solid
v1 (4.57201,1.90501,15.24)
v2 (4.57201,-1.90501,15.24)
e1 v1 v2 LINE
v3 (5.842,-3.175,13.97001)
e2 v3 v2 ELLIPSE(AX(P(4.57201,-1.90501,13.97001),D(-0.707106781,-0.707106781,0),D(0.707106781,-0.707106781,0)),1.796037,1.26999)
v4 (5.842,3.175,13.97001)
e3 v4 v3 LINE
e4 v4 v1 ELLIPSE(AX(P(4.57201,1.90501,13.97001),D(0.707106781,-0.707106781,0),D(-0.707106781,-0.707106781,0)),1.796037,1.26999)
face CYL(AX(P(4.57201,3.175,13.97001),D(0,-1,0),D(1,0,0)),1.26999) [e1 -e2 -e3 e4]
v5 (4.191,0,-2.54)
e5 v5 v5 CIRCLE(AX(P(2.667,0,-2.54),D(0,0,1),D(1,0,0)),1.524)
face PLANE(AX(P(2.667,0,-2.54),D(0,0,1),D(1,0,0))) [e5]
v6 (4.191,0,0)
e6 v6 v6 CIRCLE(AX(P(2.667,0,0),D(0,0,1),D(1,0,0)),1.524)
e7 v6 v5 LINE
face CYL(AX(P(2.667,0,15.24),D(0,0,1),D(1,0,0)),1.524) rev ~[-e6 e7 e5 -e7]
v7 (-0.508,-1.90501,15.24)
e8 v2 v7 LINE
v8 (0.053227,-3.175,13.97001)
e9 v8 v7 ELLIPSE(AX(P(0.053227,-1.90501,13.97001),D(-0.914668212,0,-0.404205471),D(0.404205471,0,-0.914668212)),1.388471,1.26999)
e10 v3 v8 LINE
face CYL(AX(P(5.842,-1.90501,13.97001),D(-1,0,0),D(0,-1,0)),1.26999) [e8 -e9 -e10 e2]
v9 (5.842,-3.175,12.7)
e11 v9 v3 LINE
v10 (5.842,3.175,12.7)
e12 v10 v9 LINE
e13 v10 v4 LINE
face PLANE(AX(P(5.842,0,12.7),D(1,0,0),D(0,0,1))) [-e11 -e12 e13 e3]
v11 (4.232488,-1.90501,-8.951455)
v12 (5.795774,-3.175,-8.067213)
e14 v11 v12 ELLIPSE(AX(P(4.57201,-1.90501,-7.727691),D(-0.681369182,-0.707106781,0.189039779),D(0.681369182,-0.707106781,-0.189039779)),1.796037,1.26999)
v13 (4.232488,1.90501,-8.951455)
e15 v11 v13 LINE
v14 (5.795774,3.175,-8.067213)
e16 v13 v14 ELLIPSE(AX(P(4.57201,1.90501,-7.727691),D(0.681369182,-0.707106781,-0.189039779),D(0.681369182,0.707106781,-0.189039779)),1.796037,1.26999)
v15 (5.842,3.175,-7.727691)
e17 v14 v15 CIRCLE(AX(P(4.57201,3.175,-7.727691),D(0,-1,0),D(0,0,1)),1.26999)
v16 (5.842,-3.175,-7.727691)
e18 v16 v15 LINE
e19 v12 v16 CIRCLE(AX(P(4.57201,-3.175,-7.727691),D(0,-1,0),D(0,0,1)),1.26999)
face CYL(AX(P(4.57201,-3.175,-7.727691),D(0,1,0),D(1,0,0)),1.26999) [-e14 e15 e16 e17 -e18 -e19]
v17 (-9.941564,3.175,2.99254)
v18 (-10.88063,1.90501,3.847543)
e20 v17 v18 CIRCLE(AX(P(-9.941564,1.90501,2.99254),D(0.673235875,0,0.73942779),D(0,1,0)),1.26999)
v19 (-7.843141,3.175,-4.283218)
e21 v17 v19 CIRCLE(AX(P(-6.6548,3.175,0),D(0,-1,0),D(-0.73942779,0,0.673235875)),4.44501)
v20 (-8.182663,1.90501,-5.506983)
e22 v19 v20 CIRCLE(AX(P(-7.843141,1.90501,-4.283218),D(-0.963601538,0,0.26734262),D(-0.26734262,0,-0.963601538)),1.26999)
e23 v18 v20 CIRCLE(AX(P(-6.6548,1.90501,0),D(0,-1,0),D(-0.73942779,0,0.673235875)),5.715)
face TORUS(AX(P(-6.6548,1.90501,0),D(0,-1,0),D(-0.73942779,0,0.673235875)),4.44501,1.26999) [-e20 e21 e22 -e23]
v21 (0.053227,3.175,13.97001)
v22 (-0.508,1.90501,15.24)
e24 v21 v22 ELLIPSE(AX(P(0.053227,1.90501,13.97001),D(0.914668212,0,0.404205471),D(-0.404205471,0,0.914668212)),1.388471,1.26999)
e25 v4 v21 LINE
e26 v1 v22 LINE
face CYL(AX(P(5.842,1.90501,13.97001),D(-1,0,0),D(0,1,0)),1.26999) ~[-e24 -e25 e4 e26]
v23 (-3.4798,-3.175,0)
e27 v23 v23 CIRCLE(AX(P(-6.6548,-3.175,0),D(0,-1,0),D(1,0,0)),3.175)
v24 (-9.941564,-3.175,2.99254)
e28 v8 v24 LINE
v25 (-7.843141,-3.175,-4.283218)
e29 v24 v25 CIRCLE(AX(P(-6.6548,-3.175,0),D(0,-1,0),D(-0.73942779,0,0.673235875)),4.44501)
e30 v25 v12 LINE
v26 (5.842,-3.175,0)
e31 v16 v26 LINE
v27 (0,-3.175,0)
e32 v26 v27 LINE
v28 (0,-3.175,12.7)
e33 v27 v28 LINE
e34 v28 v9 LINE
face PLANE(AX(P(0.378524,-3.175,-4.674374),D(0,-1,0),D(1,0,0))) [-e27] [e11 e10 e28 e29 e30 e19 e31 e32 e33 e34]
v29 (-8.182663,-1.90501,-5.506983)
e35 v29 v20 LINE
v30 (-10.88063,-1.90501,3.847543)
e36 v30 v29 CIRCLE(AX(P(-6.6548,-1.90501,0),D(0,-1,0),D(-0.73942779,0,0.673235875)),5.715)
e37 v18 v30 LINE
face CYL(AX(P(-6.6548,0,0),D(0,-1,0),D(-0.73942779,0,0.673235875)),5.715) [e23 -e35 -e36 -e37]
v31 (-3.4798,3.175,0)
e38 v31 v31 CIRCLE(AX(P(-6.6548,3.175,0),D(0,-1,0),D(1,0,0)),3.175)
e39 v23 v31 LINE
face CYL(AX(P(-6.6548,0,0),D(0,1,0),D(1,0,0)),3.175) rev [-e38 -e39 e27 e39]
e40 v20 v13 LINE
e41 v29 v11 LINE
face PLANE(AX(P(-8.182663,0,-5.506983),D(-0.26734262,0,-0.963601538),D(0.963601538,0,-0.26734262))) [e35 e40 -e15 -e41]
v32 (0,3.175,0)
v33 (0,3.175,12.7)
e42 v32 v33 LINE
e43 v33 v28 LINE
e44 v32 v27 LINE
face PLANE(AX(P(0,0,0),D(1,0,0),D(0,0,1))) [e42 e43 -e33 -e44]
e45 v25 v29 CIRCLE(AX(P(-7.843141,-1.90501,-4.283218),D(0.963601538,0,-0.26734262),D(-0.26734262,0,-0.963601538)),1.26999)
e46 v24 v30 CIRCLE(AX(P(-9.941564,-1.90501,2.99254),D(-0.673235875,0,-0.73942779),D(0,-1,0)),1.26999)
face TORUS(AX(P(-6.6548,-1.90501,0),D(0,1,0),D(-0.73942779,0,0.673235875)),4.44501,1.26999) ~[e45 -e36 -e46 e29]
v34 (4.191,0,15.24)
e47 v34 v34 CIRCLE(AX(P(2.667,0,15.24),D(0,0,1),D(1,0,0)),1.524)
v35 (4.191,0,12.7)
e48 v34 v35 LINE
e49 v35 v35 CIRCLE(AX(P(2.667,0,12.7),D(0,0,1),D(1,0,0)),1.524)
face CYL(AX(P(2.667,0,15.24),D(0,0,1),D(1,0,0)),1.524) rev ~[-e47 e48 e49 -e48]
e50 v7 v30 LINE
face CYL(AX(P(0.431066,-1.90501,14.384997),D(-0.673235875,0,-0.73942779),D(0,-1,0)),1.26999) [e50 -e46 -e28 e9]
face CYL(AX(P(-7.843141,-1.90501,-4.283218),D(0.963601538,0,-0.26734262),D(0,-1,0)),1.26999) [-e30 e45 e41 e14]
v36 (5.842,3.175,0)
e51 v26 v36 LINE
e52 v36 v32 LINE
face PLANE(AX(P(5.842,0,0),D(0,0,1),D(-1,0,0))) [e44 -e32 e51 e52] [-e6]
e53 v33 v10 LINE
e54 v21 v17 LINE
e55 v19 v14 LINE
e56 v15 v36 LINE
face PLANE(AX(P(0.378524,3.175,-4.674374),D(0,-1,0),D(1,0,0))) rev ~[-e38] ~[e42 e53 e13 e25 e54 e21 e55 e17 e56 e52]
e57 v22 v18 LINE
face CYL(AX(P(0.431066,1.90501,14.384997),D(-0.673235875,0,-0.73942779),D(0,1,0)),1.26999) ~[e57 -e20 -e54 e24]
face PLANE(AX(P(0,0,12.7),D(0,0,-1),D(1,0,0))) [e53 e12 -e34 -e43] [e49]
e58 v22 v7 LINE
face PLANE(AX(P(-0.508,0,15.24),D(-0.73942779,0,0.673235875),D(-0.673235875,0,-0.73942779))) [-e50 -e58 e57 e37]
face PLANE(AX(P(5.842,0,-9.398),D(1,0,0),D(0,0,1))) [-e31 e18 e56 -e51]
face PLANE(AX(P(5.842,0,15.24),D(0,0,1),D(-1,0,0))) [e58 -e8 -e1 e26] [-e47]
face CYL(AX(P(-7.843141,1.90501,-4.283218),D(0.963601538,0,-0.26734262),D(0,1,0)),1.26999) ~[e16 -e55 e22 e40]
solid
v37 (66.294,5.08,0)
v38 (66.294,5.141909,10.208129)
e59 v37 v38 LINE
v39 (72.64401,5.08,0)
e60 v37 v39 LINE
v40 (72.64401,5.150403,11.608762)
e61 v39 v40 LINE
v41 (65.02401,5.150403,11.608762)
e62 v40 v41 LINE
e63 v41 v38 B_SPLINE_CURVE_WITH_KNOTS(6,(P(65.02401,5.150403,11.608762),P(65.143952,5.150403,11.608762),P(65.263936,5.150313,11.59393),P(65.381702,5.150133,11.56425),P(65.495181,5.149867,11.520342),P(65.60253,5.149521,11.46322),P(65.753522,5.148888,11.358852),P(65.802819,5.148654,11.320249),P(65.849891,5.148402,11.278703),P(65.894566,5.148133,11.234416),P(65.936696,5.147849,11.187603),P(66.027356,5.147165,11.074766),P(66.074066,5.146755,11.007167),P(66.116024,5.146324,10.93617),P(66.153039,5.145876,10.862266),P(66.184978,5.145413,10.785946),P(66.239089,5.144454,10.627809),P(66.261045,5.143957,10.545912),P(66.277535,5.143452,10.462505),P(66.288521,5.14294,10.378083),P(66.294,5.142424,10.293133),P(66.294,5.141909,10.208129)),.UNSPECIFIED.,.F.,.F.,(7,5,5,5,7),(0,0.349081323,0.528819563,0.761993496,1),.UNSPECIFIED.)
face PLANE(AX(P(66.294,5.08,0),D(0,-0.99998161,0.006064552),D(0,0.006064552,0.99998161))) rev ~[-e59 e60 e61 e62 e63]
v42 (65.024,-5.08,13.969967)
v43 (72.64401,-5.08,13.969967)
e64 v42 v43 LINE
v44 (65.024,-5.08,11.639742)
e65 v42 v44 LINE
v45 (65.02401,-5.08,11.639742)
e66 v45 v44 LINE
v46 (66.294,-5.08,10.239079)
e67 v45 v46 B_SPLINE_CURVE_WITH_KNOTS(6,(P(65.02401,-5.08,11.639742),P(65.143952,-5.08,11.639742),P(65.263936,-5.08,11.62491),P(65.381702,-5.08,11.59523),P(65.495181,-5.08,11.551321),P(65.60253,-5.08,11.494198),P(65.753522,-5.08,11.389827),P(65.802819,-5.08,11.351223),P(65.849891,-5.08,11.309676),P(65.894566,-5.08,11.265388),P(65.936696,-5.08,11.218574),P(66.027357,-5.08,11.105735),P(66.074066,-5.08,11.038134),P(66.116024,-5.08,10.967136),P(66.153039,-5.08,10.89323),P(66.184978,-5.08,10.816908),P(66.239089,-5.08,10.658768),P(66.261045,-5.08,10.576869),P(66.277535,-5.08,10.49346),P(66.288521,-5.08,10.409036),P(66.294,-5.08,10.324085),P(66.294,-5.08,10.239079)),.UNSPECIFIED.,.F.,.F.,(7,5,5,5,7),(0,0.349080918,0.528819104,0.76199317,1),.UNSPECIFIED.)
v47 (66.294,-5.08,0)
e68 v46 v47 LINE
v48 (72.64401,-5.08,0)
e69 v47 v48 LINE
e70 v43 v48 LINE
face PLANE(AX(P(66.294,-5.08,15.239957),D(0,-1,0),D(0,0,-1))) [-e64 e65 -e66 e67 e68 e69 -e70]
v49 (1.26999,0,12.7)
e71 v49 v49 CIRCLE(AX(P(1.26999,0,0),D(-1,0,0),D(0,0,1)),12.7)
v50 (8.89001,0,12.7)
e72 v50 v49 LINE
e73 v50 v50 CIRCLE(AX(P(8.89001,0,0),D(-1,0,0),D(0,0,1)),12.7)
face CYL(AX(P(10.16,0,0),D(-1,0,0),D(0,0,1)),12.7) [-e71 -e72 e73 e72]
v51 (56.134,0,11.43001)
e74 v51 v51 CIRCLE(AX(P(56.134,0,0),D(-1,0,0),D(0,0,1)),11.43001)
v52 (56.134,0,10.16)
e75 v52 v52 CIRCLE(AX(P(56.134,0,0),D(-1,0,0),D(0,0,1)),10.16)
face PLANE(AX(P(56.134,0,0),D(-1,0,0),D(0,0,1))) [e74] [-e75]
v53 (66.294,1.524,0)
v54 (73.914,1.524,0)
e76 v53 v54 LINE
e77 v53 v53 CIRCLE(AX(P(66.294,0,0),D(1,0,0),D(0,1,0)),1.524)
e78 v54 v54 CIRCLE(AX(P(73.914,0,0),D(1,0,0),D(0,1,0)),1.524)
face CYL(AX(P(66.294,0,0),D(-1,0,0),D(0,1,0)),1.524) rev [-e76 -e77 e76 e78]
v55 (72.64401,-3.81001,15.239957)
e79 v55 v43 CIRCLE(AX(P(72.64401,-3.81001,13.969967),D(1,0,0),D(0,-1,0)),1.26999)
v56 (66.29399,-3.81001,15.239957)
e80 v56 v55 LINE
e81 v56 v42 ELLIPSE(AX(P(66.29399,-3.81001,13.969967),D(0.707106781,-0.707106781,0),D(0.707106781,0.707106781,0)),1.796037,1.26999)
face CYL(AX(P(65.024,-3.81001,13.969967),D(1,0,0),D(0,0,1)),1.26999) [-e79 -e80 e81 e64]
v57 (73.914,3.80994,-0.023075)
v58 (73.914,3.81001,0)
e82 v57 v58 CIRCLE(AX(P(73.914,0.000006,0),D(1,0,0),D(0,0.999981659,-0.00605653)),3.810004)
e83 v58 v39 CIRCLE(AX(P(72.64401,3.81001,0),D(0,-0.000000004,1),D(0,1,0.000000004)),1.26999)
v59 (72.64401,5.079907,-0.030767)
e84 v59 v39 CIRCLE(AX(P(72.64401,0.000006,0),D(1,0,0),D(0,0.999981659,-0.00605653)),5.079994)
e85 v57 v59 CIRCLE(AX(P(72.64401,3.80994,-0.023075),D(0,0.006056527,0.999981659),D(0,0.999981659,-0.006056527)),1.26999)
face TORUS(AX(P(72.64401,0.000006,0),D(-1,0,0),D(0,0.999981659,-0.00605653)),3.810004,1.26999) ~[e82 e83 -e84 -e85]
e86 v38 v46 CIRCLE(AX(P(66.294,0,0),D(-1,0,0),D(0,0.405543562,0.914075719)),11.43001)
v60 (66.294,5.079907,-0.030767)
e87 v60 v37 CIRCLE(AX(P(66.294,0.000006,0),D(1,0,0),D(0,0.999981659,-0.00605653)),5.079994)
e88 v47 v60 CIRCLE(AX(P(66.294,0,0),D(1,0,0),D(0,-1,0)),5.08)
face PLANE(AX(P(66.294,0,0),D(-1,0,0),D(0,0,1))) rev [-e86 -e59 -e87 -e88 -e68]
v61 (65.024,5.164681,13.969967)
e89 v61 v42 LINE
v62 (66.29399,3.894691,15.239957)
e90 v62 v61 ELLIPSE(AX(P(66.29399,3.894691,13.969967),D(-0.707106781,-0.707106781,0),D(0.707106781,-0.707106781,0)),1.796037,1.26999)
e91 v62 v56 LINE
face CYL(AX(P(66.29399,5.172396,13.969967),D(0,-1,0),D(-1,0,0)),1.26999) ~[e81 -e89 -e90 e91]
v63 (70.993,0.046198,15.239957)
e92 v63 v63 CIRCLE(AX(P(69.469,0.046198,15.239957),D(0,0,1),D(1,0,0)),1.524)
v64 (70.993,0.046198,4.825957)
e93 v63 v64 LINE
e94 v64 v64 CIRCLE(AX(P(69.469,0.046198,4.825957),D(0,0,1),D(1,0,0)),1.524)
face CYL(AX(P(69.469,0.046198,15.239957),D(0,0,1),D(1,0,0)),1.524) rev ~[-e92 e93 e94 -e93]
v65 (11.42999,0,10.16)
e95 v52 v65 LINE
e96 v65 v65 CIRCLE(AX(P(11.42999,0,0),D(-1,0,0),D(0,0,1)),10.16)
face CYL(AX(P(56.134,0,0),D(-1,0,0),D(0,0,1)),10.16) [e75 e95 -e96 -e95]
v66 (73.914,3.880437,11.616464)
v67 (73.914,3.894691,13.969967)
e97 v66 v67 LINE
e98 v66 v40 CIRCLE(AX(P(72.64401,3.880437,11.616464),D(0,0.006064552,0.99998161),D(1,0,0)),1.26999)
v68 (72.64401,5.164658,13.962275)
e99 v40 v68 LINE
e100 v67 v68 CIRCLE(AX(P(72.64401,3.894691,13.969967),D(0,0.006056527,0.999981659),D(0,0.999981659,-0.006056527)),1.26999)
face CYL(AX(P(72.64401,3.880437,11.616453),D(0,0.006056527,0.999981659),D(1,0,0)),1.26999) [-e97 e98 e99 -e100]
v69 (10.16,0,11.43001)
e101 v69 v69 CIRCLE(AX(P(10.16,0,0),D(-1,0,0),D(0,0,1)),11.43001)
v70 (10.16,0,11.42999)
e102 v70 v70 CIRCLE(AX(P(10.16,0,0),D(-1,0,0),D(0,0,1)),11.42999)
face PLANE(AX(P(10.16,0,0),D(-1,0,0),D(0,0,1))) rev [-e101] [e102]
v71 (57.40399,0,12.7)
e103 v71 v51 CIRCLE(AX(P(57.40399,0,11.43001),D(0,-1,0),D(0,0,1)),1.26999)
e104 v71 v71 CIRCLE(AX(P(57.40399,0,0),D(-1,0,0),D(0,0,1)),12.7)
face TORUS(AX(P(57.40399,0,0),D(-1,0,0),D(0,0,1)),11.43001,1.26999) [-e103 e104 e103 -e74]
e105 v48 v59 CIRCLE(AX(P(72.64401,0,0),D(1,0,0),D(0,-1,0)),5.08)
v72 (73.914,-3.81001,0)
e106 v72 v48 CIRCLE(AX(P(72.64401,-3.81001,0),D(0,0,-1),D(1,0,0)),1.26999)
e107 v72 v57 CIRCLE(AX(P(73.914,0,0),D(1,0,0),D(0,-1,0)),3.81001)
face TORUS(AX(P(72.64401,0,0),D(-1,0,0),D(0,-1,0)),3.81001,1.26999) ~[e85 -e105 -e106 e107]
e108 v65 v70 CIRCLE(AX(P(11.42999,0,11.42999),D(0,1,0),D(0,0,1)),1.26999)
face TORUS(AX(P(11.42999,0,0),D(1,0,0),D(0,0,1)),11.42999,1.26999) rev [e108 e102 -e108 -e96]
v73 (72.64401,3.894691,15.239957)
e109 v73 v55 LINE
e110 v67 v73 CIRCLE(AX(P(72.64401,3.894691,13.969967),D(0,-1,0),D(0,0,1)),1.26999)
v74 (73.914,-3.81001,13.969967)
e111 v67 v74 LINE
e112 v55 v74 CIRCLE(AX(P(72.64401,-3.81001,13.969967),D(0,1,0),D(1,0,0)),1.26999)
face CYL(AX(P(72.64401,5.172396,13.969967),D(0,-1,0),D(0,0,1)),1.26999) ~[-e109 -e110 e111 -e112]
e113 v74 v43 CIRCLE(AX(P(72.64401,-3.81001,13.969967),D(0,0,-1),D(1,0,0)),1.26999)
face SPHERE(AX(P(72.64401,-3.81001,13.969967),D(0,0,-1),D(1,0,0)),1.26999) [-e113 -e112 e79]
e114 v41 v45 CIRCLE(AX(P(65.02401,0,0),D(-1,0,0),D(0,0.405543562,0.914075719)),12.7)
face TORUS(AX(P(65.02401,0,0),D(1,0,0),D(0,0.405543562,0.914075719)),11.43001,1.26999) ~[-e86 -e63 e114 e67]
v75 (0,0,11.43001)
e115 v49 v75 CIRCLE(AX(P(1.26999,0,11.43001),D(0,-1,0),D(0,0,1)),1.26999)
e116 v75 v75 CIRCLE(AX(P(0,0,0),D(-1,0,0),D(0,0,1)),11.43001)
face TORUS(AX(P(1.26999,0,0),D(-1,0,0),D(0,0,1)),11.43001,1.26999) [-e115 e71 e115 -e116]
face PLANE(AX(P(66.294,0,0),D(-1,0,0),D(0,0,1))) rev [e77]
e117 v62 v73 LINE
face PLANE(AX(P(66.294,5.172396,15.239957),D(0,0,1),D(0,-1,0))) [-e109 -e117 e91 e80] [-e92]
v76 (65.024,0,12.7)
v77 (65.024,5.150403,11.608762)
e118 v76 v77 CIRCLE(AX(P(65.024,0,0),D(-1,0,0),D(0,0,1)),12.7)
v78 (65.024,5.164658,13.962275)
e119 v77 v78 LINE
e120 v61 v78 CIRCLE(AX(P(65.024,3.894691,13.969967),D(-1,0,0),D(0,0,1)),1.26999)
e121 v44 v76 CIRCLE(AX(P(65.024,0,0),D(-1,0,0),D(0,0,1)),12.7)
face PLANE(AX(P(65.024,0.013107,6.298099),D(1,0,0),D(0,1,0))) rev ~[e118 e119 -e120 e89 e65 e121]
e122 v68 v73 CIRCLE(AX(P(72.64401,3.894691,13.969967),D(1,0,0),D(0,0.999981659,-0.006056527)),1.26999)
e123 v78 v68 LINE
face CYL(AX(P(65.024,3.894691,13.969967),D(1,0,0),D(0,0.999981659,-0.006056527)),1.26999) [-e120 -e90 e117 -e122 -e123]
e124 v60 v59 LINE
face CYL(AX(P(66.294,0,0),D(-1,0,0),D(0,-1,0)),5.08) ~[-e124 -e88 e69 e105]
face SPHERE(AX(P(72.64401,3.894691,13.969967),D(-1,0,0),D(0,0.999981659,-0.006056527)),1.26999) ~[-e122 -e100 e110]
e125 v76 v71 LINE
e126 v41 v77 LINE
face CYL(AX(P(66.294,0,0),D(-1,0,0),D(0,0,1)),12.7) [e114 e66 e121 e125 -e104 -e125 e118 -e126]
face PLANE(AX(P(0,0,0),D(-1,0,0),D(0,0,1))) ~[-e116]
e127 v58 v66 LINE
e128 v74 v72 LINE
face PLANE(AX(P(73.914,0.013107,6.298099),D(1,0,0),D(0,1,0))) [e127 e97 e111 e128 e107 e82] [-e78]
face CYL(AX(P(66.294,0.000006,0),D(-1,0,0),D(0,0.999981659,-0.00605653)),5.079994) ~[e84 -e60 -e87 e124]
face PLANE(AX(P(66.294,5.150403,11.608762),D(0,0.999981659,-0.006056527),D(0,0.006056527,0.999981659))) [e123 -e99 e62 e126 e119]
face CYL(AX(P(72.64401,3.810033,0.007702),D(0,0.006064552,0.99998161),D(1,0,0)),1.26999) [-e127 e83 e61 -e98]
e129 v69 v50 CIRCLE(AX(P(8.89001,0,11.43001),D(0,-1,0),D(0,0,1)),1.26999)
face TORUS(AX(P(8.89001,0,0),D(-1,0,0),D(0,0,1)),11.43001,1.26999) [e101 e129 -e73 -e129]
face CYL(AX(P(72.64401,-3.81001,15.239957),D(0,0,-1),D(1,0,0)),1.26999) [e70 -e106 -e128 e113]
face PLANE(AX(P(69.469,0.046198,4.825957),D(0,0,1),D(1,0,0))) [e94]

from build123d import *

# Parameters (mm, degrees)
F0_W          = 5.842
F0_H          = 12.7
F0_R          = 3.175
F2_DEPTH      = 3.175
F3_R          = 1.524
F4_DEPTH      = 7.62
F4_DEPTH_BACK = 1.27
F5_R          = 1.524
F6_DEPTH      = 17.78
F7_R          = 1.524
F8_DEPTH      = 10.414
F9_R          = 1.26999
F9_2_R        = 1.26999


# Not quite as in the source:
# - a fillet or chamfer is up to 0.001 mm smaller than in the source, because OpenCascade refuses the exact size
# - ends of sketch curves that miss each other by under 0.0002 mm in the source are joined


with BuildPart() as f1:
    # F0 (on Front) → F1 (revolve)
    with BuildSketch(Plane.XZ):
        Polygon((5.842, 12.7), (5.842, 0), (66.294, 0), (66.294, 12.7), (56.134, 12.7), (56.134, 10.16), (10.16, 10.16), (10.16, 12.7), align=None)
        with Locations((2.921, 6.35)):
            Rectangle(F0_W, F0_H)
    revolve(axis=Axis((33.147, 0, 0), (-1, 0, 0)))

    # F3 (on face) → F4 (join, two sides)
    with BuildSketch(Plane.YZ.offset(66.294)) as f4_sk:
        with BuildLine():
            ThreePointArc((-5.08, 0), (0, 5.08), (5.08, 0))
            Line((5.08, 0), (5.1504032361, 11.6087616267))
            ThreePointArc((5.1504032361, 11.6087616267), (0.0384591199, 12.6999417674), (-5.08, 11.6397422652))
            Line((-5.08, 11.6397422652), (-5.08, 0))
        make_face()
        with BuildLine():
            ThreePointArc((5.0799068281, -0.0307671549), (5.079976707, -0.015383648), (5.08, 0))
            ThreePointArc((5.08, 0), (0, 5.08), (-5.08, 0))
            ThreePointArc((-5.08, 0), (-0.015383648, -5.079976707), (5.0799068281, -0.0307671549))
        make_face()
        Circle(F3_R, mode=Mode.SUBTRACT)
        with BuildLine():
            ThreePointArc((-5.08, 11.6397422652), (0.0384591199, 12.6999417674), (5.1504032361, 11.6087616267))
            Line((5.1504032361, 11.6087616267), (5.1723960715, 15.2399571309))
            Line((5.1723960715, 15.2399571309), (-5.08, 15.2399571309))
            Line((-5.08, 15.2399571309), (-5.08, 11.6397422652))
        make_face()
    extrude(amount=F4_DEPTH)
    extrude(f4_sk.sketch, amount=-F4_DEPTH_BACK)

    # F7 (on face) → F8 (cut)
    with BuildSketch(Plane.XY.offset(15.2399571309)):
        with Locations((69.469, 0.0461980357)):
            Circle(F7_R)
    extrude(amount=-F8_DEPTH, mode=Mode.SUBTRACT)

    # F9 (radius 1.27 in the source; OpenCascade refuses exactly that, so slightly less here)
    f9_edges = [f1.edges().sort_by_distance(p)[0] for p in [
        (66.294, -0.038459, -12.699942),
        (10.16, 0, -12.7),
        (0, 0, -12.7),
        (69.469, 5.172396, 15.239957),
        (73.914, 0, -5.08),
        (73.914, 0.046198, 15.239957),
        (69.469, -5.08, 15.239957),
        (65.024, 0.046198, 15.239957),
        (10.16, 0, -10.16),
        (56.134, 0, -12.7),
        (73.914, -5.08, 7.619979),
        (73.914, 5.115202, 5.804381),
    ]]
    fillet(f9_edges, radius=F9_R)


with BuildPart() as f2:
    # F0 (on Front) → F2 (new body, symmetric)
    with BuildSketch(Plane.XZ):
        with BuildLine():
            Line((5.842, 0), (0, 0))
            Line((0, 0), (-0.9398, 0))
            ThreePointArc((-0.9398, 0), (-3.1957909266, -4.5493385486), (-8.1826630726, -5.5069827884))
            Line((-8.1826630726, -5.5069827884), (5.842, -9.398))
            Line((5.842, -9.398), (5.842, 0))
        make_face()
        with BuildLine():
            ThreePointArc((-8.1826630726, -5.5069827884), (-3.1957909266, -4.5493385486), (-0.9398, 0))
            ThreePointArc((-0.9398, 0), (-4.5919612295, 5.3297205562), (-10.8806298187, 3.8475430269))
            ThreePointArc((-10.8806298187, 3.8475430269), (-12.1459778134, -1.5837270034), (-8.1826630726, -5.5069827884))
        make_face()
        with Locations((-6.6548, 0)):
            Circle(F0_R, mode=Mode.SUBTRACT)
        with BuildLine():
            Line((-0.9398, 0), (0, 0))
            Line((0, 0), (0, 12.7))
            Line((0, 12.7), (5.842, 12.7))
            Line((5.842, 12.7), (5.842, 15.24))
            Line((5.842, 15.24), (-0.508, 15.24))
            Line((-0.508, 15.24), (-10.8806298187, 3.8475430269))
            ThreePointArc((-10.8806298187, 3.8475430269), (-4.5919612295, 5.3297205562), (-0.9398, 0))
        make_face()
    extrude(amount=F2_DEPTH, both=True)

    # F5 (on face) → F6 (cut)
    with BuildSketch(Plane.XY.offset(15.24)):
        with Locations((2.667, 0)):
            Circle(F5_R)
    extrude(amount=-F6_DEPTH, mode=Mode.SUBTRACT)

    # F9#2 (radius 1.27 in the source; OpenCascade refuses exactly that, so slightly less here)
    f9_2_edges = [f2.edges().sort_by_distance(p)[0] for p in [
        (5.842, 0, 15.24),
        (2.667, 3.175, 15.24),
        (-5.694315, 3.175, 9.543772),
        (-12.145978, 3.175, -1.583727),
        (-5.694315, -3.175, 9.543772),
        (-12.145978, -3.175, -1.583727),
        (-1.170332, -3.175, -7.452491),
        (-1.170332, 3.175, -7.452491),
        (5.842, 0, -9.398),
        (-8.182663, 0, -5.506983),
        (2.667, -3.175, 15.24),
    ]]
    fillet(f9_2_edges, radius=F9_2_R)


solid = Compound([f1.part, f2.part])
